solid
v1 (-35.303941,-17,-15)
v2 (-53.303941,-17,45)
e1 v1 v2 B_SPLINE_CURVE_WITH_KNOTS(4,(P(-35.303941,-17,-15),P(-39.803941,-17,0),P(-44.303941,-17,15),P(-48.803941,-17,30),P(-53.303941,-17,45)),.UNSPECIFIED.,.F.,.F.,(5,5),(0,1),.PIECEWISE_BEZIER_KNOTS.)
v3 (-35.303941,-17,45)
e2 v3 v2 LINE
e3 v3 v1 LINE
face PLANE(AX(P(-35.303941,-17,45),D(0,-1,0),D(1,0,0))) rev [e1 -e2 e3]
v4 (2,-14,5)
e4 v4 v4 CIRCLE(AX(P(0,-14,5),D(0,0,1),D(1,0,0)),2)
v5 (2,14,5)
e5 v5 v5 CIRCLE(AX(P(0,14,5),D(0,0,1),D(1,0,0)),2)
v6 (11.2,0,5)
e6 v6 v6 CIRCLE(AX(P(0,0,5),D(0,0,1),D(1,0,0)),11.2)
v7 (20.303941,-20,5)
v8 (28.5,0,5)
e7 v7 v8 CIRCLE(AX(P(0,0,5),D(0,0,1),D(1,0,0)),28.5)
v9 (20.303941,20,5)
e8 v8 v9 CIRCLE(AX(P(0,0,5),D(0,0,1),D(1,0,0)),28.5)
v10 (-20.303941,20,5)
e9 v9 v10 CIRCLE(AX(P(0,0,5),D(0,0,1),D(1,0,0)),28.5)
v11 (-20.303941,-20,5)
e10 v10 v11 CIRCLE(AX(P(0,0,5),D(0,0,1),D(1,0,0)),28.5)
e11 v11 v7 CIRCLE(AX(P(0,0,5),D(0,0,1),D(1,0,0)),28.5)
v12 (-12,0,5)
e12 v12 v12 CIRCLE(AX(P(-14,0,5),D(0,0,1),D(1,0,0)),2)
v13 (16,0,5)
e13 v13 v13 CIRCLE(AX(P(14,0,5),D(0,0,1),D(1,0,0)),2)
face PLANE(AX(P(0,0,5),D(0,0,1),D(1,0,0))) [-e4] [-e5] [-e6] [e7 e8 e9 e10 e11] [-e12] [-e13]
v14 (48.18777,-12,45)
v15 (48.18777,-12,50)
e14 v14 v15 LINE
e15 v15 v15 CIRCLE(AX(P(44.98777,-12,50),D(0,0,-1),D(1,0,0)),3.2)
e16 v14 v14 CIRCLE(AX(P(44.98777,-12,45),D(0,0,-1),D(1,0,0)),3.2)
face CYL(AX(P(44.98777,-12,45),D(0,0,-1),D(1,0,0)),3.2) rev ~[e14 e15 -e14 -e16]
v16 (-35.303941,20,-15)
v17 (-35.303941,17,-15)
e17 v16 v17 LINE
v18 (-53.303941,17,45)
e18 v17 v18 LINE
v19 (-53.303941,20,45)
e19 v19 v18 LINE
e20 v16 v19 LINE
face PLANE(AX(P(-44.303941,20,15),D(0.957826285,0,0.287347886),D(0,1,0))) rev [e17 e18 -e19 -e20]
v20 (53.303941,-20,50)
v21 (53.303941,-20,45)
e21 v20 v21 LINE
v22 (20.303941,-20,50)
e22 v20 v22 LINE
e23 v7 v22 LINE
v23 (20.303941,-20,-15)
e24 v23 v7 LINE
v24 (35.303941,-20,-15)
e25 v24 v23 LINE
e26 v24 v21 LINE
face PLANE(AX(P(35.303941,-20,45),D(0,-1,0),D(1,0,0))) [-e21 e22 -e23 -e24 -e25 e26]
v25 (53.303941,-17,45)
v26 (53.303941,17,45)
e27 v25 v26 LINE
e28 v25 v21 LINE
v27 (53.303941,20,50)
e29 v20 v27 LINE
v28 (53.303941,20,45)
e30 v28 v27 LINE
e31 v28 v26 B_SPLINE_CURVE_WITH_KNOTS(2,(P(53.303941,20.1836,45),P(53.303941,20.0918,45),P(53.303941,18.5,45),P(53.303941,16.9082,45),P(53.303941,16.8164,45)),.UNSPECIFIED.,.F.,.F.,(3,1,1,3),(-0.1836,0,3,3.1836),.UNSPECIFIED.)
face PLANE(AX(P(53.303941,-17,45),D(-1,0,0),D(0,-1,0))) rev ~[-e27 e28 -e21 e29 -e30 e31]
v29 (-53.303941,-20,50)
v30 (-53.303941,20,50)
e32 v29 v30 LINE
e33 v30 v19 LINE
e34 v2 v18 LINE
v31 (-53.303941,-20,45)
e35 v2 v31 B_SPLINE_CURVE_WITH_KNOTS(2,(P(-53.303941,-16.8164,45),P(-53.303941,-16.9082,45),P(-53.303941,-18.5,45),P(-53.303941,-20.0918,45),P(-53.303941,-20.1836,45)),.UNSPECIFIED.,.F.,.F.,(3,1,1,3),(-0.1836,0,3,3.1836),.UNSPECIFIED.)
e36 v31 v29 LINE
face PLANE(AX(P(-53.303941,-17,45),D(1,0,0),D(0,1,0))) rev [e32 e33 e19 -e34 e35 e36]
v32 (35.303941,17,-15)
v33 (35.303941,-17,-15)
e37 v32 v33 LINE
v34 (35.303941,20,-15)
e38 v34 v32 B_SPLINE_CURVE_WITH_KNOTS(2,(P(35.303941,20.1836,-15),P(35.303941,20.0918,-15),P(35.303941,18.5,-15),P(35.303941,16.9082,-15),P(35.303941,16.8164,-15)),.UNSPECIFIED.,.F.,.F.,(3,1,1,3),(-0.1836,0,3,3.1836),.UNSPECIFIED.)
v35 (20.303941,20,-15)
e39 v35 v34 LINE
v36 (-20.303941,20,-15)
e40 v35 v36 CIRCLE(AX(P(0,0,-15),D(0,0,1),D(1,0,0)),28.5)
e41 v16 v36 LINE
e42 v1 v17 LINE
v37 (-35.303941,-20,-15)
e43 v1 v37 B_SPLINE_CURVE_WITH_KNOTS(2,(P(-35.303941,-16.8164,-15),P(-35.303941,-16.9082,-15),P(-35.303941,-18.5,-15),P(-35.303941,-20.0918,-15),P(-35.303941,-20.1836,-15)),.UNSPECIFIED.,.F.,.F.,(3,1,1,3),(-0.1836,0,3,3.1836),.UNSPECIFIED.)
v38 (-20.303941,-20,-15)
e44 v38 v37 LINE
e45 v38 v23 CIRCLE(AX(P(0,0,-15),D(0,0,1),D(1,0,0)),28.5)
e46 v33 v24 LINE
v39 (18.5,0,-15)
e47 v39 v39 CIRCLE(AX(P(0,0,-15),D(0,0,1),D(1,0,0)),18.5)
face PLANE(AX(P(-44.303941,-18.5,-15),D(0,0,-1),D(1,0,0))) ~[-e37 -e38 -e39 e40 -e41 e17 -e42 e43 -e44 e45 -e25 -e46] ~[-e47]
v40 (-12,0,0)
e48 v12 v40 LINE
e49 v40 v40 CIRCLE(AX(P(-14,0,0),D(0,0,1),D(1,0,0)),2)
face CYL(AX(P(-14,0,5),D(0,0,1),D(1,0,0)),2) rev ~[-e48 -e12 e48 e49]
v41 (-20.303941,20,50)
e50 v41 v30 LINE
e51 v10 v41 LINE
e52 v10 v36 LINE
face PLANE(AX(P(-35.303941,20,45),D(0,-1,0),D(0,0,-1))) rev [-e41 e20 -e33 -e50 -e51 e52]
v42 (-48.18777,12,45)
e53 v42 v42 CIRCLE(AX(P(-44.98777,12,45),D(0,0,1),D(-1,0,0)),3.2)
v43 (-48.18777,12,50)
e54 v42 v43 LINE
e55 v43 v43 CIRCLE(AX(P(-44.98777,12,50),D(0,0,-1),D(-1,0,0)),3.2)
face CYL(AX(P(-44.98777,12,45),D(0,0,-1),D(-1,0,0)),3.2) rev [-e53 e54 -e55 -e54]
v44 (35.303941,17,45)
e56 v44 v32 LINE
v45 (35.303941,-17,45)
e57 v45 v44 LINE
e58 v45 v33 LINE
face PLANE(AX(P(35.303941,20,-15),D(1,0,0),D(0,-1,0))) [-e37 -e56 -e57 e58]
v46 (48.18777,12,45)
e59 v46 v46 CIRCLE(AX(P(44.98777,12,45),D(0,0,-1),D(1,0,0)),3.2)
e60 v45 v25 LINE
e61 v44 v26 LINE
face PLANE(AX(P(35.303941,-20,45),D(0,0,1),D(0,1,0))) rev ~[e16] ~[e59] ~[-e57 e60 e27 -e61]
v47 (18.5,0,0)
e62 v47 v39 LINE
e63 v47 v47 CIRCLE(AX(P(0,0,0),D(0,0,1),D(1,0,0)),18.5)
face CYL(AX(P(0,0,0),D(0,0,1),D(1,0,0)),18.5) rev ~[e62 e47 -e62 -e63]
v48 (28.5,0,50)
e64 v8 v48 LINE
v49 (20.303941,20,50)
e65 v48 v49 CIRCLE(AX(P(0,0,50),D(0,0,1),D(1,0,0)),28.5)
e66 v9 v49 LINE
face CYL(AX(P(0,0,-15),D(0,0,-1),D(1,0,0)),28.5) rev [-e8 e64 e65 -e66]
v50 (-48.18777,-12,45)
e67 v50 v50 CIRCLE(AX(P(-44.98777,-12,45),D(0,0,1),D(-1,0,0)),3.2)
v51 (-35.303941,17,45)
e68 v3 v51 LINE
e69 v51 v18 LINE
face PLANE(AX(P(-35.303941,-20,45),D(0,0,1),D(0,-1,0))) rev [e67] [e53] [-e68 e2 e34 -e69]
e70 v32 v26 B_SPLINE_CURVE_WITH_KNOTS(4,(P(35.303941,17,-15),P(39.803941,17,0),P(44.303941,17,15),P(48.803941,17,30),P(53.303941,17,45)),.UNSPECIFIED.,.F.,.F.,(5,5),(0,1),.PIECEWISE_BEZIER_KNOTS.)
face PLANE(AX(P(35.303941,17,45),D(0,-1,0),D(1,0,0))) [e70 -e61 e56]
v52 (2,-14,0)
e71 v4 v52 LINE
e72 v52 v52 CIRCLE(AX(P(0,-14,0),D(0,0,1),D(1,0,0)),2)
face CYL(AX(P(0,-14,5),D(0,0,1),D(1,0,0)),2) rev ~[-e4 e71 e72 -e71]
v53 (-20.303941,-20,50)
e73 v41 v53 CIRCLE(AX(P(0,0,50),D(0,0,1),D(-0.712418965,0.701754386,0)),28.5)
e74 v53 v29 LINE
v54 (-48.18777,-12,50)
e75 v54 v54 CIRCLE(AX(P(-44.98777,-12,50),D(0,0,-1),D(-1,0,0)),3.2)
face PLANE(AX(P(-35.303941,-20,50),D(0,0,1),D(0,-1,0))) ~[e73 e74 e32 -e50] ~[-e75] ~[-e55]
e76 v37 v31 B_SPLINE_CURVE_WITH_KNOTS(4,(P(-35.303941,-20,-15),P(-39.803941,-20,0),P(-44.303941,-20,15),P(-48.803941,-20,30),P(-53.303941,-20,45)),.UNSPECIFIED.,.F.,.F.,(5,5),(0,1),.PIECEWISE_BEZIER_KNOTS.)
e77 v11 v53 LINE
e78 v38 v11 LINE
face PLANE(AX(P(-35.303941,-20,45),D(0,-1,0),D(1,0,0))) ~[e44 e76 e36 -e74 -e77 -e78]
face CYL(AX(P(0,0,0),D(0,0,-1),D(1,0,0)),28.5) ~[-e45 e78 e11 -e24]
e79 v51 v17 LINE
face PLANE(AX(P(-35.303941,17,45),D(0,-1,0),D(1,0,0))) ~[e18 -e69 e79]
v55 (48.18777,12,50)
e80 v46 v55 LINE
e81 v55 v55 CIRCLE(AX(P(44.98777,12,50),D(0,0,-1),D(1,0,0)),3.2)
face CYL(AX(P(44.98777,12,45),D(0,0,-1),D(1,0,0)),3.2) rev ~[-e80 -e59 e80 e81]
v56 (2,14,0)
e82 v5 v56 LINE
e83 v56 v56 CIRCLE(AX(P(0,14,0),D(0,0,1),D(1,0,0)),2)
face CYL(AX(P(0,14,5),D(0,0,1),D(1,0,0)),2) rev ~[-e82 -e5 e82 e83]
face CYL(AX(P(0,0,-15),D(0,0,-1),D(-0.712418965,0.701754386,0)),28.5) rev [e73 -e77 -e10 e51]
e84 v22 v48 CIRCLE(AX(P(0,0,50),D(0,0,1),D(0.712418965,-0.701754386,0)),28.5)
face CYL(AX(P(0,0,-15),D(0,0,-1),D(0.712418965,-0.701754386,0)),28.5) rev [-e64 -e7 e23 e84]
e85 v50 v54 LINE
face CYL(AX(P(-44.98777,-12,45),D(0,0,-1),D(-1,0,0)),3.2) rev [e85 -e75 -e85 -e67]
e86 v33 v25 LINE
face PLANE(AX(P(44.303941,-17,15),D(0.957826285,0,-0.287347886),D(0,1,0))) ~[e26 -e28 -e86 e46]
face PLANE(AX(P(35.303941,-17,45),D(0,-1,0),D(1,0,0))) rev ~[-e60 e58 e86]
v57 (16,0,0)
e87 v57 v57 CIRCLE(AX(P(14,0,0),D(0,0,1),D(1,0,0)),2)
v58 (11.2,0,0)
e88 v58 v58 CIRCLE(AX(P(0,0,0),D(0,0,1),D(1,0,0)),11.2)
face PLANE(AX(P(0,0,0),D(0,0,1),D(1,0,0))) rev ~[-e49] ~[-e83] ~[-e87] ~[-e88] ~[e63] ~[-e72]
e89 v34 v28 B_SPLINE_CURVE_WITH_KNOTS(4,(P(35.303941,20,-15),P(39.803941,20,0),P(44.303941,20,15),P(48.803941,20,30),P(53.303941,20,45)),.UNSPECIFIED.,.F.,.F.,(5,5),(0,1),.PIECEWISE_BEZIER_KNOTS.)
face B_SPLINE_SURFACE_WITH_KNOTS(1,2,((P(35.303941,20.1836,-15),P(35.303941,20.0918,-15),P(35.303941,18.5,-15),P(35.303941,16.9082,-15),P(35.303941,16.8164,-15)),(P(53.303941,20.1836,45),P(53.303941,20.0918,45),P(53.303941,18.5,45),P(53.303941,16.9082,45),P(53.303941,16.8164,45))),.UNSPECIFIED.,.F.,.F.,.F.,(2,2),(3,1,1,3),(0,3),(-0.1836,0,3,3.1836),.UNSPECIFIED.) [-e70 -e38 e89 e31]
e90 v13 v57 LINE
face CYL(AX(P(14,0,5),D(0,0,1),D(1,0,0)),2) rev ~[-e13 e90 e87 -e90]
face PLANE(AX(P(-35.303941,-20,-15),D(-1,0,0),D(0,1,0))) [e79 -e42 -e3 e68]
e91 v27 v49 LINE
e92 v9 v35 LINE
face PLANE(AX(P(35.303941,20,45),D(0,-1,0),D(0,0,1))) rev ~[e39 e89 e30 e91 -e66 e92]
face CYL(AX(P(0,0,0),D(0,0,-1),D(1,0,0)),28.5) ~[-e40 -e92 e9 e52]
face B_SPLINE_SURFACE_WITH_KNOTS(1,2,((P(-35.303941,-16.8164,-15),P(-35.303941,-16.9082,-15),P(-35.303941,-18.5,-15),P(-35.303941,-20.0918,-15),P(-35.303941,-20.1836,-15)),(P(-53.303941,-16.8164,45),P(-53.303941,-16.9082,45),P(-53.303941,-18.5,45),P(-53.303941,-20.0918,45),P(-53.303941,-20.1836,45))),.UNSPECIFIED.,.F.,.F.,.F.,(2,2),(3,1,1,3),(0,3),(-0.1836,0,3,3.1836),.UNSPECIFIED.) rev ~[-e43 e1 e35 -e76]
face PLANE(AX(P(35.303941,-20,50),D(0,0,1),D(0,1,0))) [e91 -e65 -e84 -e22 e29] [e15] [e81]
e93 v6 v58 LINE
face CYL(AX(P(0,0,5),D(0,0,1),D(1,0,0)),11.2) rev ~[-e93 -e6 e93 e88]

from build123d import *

# Parameters (mm, degrees)
F0_R         = 28.5
F0_R_2       = 18.5
F1_DEPTH     = 15
F2_R         = 28.5
F2_R_2       = 18.5
F3_DEPTH     = 5
F4_R         = 2
F4_R_2       = 11.2
F5_DEPTH     = 25
F7_DEPTH     = 65
F8_W         = 40
F8_H         = 5
F9_DEPTH     = 18
F10_R        = 3.2
F11_DEPTH    = 25
F12_W        = 18
F12_H        = 3
F13_DEPTH    = 60
F14_C1_SIZE2 = 60
F14_C1_SIZE  = 18
F14_C2_SIZE2 = 60
F14_C2_SIZE  = 18
F14_C3_SIZE2 = 60
F14_C3_SIZE  = 18
F14_C4_SIZE2 = 60
F14_C4_SIZE  = 18


# Not quite as in the source:
# - a pattern or mirror of a feature is missing from the dataset's text; its kind, count and spacing are read off the source's solid
# - a feature names something its author has since deleted; it is built from what else it names


with BuildPart() as f1:
    # F0 (on Top) → F1 (new body)
    with BuildSketch(Plane.XY):
        Circle(F0_R)
        Circle(F0_R_2, mode=Mode.SUBTRACT)
    extrude(amount=-F1_DEPTH)

    # F2 (on face) → F3 (join)
    with BuildSketch(Plane.XY):
        Circle(F2_R)
        Circle(F2_R_2, mode=Mode.SUBTRACT)
        Circle(F2_R_2)
    extrude(amount=F3_DEPTH)

    # F4 (on face) → F5 (cut)
    with BuildSketch(Plane.XY.offset(5)):
        with Locations((0, 14)):
            Circle(F4_R)
        Circle(F4_R_2)
        with Locations((-14, 0)):
            Circle(F4_R)
        with Locations((0, -14)):
            Circle(F4_R)
        with Locations((14, 0)):
            Circle(F4_R)
    extrude(amount=-F5_DEPTH, mode=Mode.SUBTRACT)

    # F6 (on face) → F7 (join)
    with BuildSketch(Plane(origin=(0, 0, -15), x_dir=(1, 0, 0), z_dir=(0, 0, -1))):
        with BuildLine():
            ThreePointArc((-20.3039405042, -20), (-28.5, 0), (-20.3039405042, 20))
            Line((-20.3039405042, 20), (-35.3039405042, 20))
            Line((-35.3039405042, 20), (-35.3039405042, -20))
            Line((-35.3039405042, -20), (-20.3039405042, -20))
        make_face()
        with BuildLine():
            Line((35.3039405042, 20), (20.3039405042, 20))
            ThreePointArc((20.3039405042, 20), (26.3715026532, 10.8071202369), (28.5, 0))
            ThreePointArc((28.5, 0), (26.3715026532, -10.8071202369), (20.3039405042, -20))
            Line((20.3039405042, -20), (35.3039405042, -20))
            Line((35.3039405042, -20), (35.3039405042, 20))
        make_face()
    extrude(amount=-F7_DEPTH)

    # F8 (on face) → F9 (join)
    with BuildSketch(Plane.YZ.offset(35.3039405042)):
        with Locations((0, 47.5)):
            Rectangle(F8_W, F8_H)
    f9 = extrude(amount=F9_DEPTH)

    # F9_copies: F9 across plane
    add(f9.mirror(Plane(origin=(0, 0, 0), x_dir=(0, 0, -1), z_dir=(-1, 0, 0))))

    # F10 (on face) → F11 (cut)
    with BuildSketch(Plane(origin=(0, 0, 45), x_dir=(1, 0, 0), z_dir=(0, 0, -1))):
        with Locations((44.9877695576, 12)):
            Circle(F10_R)
        with Locations((44.9877695576, -12)):
            Circle(F10_R)
    f11 = extrude(amount=-F11_DEPTH, mode=Mode.SUBTRACT)

    # F11_copies: F11 across plane
    add(f11.mirror(Plane(origin=(0, 0, 0), x_dir=(0, 0, -1), z_dir=(-1, 0, 0))), mode=Mode.SUBTRACT)

    # F12 (on face) → F13 (join)
    with BuildSketch(Plane(origin=(0, 0, 45), x_dir=(1, 0, 0), z_dir=(0, 0, -1))):
        with Locations((44.3039405042, 18.5)):
            Rectangle(F12_W, F12_H)
        with Locations((44.3039405042, -18.5)):
            Rectangle(F12_W, F12_H)
    f13 = extrude(amount=F13_DEPTH)

    # F13_copies: F13 across plane
    add(f13.mirror(Plane(origin=(0, 0, 0), x_dir=(0, 0, -1), z_dir=(-1, 0, 0))))

    # F14: chamfer of 60 x 18 on 4 edges, made by hand

    # F14_c1
    f14_c1_edges = [f1.edges().sort_by_distance(p)[0] for p in [
        (-53.3039405042, 18.5, -15),
    ]]
    f14_c1_side = f1.faces().sort_by_distance((-52.9439405042, 18.5, -15))[0]
    chamfer(f14_c1_edges, length=F14_C1_SIZE, length2=F14_C1_SIZE2, reference=f14_c1_side)

    # F14_c2
    f14_c2_edges = [f1.edges().sort_by_distance(p)[0] for p in [
        (-53.3039405042, -18.5, -15),
    ]]
    f14_c2_side = f1.faces().sort_by_distance((-52.9439405042, -18.5, -15))[0]
    chamfer(f14_c2_edges, length=F14_C2_SIZE, length2=F14_C2_SIZE2, reference=f14_c2_side)

    # F14_c3
    f14_c3_edges = [f1.edges().sort_by_distance(p)[0] for p in [
        (53.3039405042, -18.5, -15),
    ]]
    f14_c3_side = f1.faces().sort_by_distance((52.9439405042, -18.5, -15))[0]
    chamfer(f14_c3_edges, length=F14_C3_SIZE, length2=F14_C3_SIZE2, reference=f14_c3_side)

    # F14_c4
    f14_c4_edges = [f1.edges().sort_by_distance(p)[0] for p in [
        (53.3039405042, 18.5, -15),
    ]]
    f14_c4_side = f1.faces().sort_by_distance((52.9439405042, 18.5, -15))[0]
    chamfer(f14_c4_edges, length=F14_C4_SIZE, length2=F14_C4_SIZE2, reference=f14_c4_side)


solid = f1.part
